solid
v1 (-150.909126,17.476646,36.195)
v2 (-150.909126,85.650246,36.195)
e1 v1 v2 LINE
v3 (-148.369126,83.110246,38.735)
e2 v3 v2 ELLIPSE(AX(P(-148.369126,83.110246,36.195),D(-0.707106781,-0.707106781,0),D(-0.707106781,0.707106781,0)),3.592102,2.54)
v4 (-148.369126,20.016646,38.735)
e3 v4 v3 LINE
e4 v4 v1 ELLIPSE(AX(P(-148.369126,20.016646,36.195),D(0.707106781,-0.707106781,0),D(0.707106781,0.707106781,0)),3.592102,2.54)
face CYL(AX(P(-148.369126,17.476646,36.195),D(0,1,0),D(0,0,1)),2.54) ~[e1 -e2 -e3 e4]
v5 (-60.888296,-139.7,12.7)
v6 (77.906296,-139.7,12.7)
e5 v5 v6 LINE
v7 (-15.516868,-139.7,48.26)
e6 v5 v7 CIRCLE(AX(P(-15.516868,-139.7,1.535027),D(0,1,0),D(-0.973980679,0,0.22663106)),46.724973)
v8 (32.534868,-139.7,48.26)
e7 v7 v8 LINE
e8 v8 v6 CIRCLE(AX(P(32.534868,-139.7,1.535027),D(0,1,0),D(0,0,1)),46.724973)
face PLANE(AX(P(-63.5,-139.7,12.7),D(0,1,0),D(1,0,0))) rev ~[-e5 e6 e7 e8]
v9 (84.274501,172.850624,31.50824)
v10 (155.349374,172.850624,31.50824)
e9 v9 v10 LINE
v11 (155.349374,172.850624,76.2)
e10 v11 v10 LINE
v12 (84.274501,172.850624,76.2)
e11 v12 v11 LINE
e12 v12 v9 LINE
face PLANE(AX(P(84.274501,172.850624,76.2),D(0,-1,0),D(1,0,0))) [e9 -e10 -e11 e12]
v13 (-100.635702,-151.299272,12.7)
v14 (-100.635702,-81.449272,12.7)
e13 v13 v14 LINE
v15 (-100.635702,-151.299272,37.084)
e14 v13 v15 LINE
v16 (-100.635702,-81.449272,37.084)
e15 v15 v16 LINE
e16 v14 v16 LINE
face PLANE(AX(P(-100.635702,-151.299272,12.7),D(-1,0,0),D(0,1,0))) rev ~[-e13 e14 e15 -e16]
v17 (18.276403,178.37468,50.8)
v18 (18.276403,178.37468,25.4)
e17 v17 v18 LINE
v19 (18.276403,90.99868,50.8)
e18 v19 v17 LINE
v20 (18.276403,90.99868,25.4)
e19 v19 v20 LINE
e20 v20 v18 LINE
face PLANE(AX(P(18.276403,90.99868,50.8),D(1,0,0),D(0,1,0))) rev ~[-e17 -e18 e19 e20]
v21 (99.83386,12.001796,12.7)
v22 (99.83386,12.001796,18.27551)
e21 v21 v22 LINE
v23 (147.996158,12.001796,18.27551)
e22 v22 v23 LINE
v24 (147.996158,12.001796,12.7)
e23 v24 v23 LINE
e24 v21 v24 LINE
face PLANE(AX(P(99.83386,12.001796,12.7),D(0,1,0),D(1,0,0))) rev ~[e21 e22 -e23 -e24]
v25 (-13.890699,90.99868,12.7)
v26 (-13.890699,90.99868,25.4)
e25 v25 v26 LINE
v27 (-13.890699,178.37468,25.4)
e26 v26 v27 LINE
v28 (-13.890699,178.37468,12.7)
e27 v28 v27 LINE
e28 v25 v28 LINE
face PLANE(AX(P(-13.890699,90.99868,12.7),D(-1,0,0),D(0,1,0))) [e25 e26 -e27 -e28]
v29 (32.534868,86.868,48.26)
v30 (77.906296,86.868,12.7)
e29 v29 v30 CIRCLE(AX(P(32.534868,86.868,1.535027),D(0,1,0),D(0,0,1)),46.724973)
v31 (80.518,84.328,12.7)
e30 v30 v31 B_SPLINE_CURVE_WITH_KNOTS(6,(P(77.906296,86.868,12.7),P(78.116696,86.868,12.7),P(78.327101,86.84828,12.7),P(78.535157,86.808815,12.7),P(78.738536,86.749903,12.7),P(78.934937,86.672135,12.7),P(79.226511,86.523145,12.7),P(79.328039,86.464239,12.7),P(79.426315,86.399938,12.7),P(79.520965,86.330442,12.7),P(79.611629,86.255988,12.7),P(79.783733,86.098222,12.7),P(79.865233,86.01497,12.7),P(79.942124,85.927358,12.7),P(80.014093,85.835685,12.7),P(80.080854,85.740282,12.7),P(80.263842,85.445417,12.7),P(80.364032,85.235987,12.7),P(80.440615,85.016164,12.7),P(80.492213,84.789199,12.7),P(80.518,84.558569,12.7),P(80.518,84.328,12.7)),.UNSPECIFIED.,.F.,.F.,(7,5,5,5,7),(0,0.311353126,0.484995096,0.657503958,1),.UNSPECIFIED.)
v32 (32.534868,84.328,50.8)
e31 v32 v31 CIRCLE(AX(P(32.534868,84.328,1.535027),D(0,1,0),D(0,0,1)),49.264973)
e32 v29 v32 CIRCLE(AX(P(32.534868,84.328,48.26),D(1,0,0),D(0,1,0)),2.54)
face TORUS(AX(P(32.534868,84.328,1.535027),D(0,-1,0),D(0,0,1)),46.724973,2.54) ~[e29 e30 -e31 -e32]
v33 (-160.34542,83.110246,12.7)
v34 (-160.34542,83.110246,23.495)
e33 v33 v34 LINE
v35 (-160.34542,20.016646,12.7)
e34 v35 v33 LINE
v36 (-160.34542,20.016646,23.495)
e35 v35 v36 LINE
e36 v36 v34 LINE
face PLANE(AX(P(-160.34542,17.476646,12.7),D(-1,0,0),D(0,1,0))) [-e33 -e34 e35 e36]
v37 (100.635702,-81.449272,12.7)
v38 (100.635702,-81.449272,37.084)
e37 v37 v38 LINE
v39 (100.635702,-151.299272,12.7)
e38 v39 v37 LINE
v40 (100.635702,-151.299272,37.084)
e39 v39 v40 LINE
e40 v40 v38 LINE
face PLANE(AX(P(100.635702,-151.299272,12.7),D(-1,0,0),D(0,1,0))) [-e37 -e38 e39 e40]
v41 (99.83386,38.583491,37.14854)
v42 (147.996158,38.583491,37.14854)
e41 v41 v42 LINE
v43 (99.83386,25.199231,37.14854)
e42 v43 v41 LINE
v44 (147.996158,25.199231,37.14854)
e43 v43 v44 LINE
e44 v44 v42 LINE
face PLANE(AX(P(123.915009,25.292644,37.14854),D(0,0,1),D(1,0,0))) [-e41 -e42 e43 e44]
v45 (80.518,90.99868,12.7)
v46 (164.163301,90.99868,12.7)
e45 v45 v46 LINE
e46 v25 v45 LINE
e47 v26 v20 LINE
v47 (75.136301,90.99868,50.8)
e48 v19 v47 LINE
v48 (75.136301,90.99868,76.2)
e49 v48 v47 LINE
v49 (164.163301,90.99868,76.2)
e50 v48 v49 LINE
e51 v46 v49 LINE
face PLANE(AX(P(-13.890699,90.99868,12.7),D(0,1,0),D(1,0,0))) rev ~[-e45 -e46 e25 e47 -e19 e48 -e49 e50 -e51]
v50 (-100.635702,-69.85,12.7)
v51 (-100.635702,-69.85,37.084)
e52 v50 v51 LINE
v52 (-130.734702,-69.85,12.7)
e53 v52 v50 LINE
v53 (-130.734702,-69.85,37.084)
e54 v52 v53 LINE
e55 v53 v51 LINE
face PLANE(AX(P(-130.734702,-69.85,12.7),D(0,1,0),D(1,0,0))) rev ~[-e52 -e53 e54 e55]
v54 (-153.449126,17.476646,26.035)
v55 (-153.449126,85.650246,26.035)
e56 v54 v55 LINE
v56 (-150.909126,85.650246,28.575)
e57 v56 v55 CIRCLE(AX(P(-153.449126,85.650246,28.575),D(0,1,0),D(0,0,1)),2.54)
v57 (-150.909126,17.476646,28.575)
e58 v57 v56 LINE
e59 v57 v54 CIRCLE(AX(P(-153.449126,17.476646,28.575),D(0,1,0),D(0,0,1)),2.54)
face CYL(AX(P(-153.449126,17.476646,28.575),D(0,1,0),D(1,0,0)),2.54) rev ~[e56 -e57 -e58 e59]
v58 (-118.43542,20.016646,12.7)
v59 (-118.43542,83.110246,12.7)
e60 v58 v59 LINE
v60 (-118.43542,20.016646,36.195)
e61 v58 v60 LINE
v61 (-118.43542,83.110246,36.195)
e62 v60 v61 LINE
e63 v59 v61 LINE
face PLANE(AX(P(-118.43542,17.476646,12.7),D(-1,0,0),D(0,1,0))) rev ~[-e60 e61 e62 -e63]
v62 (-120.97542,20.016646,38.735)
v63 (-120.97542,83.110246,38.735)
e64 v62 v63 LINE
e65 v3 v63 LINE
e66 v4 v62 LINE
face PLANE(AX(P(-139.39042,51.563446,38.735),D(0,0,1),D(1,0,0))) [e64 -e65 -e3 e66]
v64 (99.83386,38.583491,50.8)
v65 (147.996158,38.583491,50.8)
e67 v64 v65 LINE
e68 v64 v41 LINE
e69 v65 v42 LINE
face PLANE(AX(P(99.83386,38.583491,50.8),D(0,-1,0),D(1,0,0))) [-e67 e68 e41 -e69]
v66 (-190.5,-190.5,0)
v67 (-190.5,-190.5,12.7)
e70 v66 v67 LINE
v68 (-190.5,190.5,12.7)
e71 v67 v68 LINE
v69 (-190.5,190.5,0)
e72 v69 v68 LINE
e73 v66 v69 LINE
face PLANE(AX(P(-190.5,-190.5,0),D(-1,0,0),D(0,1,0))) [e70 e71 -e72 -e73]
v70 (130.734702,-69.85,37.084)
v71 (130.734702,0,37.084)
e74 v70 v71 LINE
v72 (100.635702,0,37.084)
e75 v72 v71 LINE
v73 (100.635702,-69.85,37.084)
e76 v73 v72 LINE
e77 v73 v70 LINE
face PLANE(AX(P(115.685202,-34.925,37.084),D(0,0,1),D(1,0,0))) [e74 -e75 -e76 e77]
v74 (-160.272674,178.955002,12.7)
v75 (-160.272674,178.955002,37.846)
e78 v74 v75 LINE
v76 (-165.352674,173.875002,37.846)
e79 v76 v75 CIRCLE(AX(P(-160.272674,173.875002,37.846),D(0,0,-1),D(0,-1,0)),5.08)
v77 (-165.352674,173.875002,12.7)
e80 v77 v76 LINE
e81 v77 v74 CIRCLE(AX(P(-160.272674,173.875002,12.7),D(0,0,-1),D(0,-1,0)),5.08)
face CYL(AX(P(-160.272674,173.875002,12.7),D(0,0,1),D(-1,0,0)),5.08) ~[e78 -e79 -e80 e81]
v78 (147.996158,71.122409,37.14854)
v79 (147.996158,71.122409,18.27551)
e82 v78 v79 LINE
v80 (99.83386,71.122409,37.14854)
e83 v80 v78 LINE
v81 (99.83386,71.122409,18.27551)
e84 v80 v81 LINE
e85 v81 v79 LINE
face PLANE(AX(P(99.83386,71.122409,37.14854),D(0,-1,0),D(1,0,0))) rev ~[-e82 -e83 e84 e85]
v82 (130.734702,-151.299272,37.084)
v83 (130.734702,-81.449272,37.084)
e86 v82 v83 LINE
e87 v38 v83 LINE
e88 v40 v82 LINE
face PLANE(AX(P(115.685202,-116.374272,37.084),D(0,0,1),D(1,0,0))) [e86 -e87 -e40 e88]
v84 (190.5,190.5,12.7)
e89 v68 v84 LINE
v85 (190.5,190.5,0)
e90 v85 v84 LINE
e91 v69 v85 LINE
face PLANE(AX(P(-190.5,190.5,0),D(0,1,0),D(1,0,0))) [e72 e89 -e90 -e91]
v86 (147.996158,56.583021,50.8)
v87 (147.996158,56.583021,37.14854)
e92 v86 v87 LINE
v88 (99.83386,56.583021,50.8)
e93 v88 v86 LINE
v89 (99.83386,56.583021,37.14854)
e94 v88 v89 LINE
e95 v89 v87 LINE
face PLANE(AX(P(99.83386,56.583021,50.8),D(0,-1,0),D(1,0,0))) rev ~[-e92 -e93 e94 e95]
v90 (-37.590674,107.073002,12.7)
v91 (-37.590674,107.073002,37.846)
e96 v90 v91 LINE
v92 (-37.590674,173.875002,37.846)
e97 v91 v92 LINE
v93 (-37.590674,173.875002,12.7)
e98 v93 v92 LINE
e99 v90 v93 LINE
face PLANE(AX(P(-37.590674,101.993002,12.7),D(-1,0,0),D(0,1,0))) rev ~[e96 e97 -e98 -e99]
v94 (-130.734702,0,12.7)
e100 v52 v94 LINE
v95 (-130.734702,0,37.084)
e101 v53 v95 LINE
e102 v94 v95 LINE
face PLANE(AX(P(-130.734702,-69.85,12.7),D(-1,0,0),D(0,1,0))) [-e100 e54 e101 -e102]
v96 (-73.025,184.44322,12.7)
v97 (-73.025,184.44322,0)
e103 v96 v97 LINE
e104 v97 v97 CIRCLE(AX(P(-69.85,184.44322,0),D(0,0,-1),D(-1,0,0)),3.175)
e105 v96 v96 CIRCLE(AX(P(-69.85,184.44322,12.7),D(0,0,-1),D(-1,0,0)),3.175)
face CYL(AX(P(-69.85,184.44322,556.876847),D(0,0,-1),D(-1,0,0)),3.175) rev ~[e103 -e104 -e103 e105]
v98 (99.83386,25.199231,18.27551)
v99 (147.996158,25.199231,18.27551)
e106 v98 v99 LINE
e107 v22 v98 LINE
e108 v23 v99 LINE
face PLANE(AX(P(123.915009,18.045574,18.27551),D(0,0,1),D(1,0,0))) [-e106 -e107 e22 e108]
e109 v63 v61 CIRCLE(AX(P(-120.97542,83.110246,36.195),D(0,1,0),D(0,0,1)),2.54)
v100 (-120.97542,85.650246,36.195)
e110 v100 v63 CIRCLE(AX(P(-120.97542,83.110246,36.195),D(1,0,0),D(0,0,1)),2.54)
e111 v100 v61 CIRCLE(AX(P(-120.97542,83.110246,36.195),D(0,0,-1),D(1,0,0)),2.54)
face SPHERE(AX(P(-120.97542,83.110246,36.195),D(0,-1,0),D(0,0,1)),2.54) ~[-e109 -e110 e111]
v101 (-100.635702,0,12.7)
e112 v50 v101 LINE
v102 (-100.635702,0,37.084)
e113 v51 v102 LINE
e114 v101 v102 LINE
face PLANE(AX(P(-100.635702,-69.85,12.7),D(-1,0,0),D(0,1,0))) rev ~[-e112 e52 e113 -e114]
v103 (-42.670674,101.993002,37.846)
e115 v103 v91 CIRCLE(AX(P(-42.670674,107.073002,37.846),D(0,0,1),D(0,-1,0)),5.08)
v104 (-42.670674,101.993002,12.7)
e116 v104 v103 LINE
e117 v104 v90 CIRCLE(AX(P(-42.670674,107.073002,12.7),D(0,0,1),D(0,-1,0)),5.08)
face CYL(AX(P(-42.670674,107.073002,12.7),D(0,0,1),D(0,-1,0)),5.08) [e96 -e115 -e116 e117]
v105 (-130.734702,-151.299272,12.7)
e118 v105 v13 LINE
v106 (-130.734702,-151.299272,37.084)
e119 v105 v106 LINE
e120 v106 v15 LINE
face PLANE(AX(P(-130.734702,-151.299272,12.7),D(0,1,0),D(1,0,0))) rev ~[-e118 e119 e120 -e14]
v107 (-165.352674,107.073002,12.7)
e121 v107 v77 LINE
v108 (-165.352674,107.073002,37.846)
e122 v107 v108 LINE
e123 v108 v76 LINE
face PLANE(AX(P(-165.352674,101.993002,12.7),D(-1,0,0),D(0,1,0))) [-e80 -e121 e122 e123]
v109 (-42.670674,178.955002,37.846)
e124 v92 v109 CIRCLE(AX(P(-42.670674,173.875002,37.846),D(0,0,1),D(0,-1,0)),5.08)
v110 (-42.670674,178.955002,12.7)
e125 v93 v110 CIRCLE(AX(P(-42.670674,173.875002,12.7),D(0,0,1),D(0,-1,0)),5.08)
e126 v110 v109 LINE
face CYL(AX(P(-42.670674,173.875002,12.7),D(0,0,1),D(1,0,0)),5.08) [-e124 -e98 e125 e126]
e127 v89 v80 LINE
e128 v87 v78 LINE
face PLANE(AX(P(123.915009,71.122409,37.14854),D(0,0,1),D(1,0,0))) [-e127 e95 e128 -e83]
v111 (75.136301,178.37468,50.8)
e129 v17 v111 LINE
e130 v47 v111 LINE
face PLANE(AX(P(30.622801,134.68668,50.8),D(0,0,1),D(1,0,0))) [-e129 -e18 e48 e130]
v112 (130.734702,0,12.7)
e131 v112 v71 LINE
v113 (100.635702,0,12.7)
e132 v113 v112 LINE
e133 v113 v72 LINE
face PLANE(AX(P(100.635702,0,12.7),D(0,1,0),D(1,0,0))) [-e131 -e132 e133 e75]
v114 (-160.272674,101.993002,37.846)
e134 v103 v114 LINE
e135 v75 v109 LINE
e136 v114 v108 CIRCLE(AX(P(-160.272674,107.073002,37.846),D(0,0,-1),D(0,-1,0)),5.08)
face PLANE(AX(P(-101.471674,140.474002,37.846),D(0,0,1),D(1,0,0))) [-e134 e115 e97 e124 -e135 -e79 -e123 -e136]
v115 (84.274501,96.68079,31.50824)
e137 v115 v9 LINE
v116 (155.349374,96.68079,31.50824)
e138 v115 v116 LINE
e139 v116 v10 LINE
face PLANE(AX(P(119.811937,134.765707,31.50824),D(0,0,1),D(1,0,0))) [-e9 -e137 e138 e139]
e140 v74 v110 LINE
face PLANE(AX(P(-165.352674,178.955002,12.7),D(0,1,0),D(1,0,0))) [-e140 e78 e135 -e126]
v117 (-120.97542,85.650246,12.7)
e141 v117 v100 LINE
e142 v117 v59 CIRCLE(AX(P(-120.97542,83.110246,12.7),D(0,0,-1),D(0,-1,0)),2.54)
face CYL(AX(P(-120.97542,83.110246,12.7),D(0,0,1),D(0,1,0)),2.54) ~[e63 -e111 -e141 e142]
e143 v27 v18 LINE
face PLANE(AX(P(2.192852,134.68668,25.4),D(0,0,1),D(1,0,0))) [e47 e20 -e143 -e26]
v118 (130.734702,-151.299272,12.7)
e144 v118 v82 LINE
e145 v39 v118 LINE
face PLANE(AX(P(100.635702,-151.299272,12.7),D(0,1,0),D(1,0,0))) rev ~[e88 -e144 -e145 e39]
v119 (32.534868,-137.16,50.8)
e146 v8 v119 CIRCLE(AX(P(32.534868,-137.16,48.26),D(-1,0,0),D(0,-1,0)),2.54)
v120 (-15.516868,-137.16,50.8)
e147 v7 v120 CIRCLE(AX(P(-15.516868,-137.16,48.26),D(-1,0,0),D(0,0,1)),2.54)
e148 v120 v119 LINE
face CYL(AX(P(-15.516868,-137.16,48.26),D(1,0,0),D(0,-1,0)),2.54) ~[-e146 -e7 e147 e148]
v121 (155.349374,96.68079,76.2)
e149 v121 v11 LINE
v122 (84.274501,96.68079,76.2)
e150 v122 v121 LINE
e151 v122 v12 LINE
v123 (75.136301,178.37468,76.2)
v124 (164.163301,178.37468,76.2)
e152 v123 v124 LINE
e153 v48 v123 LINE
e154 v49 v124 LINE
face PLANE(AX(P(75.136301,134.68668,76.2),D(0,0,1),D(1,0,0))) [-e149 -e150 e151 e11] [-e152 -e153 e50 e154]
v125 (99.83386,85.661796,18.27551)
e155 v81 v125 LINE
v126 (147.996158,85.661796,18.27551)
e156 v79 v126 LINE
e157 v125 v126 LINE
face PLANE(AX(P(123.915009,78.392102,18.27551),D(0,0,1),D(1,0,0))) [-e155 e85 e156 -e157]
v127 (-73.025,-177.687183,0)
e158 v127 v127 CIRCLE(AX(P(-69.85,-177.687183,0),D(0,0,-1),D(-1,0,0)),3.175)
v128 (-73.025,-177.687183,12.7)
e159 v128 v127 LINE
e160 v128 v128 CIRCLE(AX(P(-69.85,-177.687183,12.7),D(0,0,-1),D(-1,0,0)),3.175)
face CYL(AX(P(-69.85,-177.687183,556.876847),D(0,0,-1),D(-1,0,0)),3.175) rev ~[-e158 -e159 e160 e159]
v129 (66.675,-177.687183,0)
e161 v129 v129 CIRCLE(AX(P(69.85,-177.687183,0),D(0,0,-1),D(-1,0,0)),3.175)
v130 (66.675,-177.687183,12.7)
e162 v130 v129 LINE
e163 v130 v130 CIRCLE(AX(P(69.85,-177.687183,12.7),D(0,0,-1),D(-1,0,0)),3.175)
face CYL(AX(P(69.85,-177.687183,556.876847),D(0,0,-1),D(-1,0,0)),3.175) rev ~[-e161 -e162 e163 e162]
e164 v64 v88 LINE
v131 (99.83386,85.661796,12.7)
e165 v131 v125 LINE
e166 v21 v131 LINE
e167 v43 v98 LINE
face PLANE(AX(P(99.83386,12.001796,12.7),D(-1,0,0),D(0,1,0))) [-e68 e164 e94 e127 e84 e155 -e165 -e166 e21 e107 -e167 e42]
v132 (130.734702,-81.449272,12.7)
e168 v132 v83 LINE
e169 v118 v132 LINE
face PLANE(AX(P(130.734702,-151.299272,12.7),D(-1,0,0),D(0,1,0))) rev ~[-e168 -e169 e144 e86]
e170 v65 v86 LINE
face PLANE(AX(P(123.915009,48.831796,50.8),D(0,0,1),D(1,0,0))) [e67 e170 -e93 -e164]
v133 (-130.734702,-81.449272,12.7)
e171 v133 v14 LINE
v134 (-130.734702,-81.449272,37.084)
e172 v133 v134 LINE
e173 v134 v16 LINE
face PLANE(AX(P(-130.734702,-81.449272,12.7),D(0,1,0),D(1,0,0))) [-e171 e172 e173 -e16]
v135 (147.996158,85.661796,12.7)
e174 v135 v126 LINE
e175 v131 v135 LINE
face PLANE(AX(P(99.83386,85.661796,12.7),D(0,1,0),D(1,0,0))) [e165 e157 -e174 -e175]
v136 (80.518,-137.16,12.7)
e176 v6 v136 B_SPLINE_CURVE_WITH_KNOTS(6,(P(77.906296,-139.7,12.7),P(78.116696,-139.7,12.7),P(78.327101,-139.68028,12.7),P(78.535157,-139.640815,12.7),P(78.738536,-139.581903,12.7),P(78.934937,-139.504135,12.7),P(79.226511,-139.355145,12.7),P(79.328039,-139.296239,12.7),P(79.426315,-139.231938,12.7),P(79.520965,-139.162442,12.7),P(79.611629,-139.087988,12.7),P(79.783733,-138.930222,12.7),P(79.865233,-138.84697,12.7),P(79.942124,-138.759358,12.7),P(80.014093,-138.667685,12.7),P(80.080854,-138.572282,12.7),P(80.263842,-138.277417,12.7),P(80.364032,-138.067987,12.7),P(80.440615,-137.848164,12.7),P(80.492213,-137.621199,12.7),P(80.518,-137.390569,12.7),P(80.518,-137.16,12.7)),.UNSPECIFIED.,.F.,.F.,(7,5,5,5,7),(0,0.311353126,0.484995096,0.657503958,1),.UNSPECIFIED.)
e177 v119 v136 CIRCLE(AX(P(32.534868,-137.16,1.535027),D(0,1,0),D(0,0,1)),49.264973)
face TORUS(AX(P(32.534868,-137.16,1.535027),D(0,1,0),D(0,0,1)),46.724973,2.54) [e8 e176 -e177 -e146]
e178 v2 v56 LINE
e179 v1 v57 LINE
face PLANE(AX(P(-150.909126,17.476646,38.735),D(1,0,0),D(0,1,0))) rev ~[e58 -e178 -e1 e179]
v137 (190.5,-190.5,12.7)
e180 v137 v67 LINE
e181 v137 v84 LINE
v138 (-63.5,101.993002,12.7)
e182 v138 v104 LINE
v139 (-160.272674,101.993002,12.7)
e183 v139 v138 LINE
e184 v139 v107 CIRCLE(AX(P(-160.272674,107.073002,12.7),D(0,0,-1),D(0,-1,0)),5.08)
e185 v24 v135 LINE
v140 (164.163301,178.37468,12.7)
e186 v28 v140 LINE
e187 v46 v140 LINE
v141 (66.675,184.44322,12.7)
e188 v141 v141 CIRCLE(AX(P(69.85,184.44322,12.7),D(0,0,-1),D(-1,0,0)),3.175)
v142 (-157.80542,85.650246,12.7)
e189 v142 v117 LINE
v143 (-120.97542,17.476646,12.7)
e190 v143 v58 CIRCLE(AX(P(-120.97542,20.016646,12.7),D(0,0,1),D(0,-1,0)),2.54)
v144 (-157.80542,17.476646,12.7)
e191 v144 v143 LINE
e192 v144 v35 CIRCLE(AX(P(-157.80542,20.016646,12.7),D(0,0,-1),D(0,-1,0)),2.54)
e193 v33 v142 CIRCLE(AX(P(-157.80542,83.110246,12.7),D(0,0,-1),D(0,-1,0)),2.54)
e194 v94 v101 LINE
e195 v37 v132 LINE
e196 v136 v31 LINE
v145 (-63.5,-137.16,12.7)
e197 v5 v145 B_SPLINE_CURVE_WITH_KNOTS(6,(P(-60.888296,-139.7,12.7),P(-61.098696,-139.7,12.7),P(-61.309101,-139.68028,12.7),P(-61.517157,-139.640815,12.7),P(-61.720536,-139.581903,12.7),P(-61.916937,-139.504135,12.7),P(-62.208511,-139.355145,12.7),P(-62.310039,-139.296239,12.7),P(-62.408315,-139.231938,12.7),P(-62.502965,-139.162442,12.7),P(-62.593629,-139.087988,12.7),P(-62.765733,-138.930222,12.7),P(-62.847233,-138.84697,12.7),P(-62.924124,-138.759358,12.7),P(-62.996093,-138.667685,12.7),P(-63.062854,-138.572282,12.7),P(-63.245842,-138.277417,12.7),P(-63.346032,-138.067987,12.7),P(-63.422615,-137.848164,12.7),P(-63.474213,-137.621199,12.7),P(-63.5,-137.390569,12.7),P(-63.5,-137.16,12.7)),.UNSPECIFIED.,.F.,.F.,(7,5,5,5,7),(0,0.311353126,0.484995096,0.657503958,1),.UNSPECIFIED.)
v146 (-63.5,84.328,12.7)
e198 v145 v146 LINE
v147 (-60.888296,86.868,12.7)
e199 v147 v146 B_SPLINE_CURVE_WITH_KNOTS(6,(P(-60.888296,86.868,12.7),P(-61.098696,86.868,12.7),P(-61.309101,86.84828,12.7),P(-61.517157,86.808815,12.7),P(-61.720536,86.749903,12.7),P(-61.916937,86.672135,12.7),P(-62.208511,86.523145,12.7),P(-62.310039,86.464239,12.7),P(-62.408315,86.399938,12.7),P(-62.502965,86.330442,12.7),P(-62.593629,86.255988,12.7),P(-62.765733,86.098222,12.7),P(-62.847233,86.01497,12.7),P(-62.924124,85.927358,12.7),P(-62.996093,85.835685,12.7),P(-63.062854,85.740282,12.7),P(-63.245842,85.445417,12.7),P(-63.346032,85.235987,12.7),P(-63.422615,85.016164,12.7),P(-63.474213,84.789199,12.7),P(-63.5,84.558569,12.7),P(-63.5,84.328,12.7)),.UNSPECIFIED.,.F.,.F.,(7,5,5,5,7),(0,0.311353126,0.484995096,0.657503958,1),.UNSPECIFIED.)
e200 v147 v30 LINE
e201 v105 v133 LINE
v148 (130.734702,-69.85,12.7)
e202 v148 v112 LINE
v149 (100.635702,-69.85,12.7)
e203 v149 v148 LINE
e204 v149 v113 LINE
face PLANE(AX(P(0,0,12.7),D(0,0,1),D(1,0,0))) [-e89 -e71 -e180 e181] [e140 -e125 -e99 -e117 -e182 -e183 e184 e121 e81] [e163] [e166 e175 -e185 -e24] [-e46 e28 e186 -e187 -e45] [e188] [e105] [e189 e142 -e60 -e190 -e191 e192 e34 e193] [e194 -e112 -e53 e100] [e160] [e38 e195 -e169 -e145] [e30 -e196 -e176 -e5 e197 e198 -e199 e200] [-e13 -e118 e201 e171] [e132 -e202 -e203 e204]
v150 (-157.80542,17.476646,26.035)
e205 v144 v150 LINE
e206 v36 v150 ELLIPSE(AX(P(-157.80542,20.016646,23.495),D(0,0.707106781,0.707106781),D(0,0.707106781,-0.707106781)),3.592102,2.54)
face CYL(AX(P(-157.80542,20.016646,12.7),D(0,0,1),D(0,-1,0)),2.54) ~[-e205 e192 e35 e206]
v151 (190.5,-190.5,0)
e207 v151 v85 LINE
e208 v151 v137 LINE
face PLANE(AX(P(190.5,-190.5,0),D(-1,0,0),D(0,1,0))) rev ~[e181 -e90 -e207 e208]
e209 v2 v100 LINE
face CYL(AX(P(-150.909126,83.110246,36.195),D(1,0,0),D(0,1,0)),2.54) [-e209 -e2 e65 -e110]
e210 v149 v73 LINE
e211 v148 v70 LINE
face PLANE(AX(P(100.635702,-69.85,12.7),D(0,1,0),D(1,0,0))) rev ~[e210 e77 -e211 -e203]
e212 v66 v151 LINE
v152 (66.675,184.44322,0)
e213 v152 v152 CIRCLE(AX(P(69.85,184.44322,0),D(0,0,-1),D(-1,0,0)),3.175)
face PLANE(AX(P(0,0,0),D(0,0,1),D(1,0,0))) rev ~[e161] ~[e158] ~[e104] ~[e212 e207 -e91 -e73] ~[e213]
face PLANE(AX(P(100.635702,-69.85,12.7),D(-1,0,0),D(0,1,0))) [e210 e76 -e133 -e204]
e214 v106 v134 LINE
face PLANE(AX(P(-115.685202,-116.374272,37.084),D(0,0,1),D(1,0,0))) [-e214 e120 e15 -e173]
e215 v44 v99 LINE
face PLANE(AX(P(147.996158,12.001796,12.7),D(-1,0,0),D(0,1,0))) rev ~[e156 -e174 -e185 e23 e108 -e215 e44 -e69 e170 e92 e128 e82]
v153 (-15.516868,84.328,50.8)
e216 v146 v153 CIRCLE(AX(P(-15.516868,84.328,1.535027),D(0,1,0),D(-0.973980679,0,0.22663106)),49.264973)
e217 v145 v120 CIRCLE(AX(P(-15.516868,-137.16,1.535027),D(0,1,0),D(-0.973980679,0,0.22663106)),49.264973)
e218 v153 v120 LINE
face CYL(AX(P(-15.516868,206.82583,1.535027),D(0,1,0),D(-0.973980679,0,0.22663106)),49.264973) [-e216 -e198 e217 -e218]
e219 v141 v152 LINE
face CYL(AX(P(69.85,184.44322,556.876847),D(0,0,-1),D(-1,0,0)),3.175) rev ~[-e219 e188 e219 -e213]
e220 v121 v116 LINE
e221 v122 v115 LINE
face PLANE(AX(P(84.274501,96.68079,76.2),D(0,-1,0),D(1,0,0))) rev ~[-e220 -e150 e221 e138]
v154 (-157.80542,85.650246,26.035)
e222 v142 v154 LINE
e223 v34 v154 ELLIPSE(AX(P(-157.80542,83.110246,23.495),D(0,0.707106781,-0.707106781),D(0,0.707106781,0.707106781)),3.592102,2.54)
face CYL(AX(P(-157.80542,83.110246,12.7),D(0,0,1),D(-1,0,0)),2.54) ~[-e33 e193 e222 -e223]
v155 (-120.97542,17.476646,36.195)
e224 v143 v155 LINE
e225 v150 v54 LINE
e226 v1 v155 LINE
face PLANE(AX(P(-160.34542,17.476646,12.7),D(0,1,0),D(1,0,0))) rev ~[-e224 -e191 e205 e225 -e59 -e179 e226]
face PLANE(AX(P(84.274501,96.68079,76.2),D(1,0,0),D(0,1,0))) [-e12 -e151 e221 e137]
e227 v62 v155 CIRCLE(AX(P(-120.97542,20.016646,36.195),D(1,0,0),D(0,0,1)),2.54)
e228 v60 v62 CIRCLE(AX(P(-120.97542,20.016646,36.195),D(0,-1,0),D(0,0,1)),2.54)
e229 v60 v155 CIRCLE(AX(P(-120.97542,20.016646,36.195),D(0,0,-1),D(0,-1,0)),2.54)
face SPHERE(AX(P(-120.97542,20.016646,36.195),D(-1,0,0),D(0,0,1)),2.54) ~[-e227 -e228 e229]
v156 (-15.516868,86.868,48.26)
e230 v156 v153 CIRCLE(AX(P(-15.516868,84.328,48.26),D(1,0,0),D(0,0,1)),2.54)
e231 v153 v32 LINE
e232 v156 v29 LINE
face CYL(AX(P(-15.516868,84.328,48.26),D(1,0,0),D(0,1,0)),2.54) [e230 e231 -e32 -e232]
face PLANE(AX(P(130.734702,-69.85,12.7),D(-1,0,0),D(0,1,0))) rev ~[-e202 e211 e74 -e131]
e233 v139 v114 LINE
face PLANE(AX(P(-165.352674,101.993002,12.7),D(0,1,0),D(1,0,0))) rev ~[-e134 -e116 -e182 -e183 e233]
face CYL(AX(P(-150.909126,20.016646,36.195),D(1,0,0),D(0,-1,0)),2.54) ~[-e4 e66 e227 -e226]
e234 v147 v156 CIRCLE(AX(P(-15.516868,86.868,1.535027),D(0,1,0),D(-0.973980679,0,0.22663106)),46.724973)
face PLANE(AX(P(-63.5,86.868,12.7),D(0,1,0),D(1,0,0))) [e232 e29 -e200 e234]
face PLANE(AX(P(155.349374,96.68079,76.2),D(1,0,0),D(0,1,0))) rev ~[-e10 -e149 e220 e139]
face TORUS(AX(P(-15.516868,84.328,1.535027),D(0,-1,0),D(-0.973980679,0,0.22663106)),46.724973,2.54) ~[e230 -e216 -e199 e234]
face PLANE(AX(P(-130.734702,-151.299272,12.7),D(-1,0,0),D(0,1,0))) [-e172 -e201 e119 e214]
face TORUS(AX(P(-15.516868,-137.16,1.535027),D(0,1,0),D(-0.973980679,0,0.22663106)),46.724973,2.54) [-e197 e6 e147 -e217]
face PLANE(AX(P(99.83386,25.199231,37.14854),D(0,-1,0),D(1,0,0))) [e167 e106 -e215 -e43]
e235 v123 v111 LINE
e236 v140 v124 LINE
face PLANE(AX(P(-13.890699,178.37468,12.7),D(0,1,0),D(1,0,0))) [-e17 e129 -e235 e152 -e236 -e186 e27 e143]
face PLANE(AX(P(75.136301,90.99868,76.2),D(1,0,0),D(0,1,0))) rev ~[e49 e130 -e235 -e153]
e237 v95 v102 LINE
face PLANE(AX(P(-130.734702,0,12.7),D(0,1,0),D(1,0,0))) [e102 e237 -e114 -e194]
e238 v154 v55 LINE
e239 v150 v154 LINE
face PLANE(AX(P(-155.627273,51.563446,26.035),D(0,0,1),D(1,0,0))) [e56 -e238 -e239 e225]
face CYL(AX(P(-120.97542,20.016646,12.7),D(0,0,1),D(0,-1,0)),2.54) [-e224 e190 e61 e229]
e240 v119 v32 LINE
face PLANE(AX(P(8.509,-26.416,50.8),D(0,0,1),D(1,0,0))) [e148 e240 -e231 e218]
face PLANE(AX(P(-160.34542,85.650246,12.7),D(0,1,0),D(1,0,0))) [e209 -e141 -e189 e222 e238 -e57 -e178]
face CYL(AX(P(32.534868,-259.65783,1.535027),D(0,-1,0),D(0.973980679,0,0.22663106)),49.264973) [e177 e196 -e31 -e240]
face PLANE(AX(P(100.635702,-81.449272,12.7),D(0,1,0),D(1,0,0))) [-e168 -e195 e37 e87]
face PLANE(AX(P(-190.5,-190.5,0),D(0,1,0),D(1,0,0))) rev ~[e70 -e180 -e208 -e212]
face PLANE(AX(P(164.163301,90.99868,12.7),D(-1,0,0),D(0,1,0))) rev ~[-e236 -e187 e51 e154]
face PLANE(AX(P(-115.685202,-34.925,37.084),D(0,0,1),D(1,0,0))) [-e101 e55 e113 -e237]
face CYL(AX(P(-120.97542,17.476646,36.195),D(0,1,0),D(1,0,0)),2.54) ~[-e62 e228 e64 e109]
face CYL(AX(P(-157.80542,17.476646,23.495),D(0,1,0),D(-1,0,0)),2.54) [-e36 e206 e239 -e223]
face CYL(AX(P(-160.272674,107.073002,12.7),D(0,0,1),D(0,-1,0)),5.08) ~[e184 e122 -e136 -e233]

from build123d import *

# Parameters (mm, degrees)
F0_W         = 381
F0_H         = 381
F1_DEPTH     = 12.7
F3_W         = 144.018
F3_H         = 226.568
F4_DEPTH     = 38.1
F5_W         = 178.054
F5_H         = 87.376
F6_DEPTH     = 63.5
F7_W         = 127.762
F7_H         = 76.962
F8_DEPTH     = 25.146
F9_W         = 41.91
F9_H         = 68.1736
F10_DEPTH    = 26.035
F11_W        = 48.1622978261
F11_H        = 73.66
F12_DEPTH    = 38.1
F13_W        = 30.099
F13_H        = 69.85
F14_DEPTH    = 24.384
F15_T4_DEPTH = 466.4836595949
F15_T9_DEPTH = 466.4836595949
F16_W        = 71.074873209
F16_H        = 76.1698335409
F17_DEPTH    = 44.69176
F18_W        = 89.027
F18_H        = 87.376
F19_DEPTH    = 25.4
F20_W        = 32.1671016191
F20_H        = 87.376
F21_DEPTH    = 25.4
F22_W        = 48.1622978261
F22_H        = 29.0787754375
F22_H_2      = 26.581694724
F23_DEPTH    = 13.65146
F24_W        = 48.1622978261
F24_H        = 14.5393877187
F24_H_2      = 14.3073135987
F25_DEPTH    = 18.87303
F26_W        = 9.4362943637
F26_H        = 68.1736
F27_DEPTH    = 12.7
F28_R        = 2.54
F30_D        = 6.35
F31_R        = 5.08


# Not quite as in the source:
# - a fillet or chamfer that OpenCascade refuses, or shapes differently, is made with other operations: its cross-section is extruded or revolved along the edge and cut away or added


with BuildPart() as f1:
    # F0 (on Top) → F1 (new body)
    with BuildSketch(Plane.XY):
        Rectangle(F0_W, F0_H)
    extrude(amount=F1_DEPTH)

    # F3 (on face) → F4 (join)
    with BuildSketch(Plane.XY.offset(12.7)):
        with Locations((8.509, -26.416)):
            Rectangle(F3_W, F3_H)
    extrude(amount=F4_DEPTH)

    # F5 (on face) → F6 (join)
    with BuildSketch(Plane.XY.offset(12.7)):
        with Locations((75.1363011077, 134.6866802573)):
            Rectangle(F5_W, F5_H)
    extrude(amount=F6_DEPTH)

    # F7 (on face) → F8 (join)
    with BuildSketch(Plane.XY.offset(12.7)):
        with Locations((-101.4716736972, 140.4740017718)):
            Rectangle(F7_W, F7_H)
    extrude(amount=F8_DEPTH)

    # F9 (on face) → F10 (join)
    with BuildSketch(Plane.XY.offset(12.7)):
        with Locations((-139.3904201686, 51.5634464747)):
            Rectangle(F9_W, F9_H)
    extrude(amount=F10_DEPTH)

    # F11 (on face) → F12 (join)
    with BuildSketch(Plane.XY.offset(12.7)):
        with Locations((123.9150092006, 48.8317962736)):
            Rectangle(F11_W, F11_H)
    extrude(amount=F12_DEPTH)

    # F13 (on face) → F14 (join)
    with BuildSketch(Plane.XY.offset(12.7)):
        with Locations((-115.685201868, -34.925)):
            Rectangle(F13_W, F13_H)
        with Locations((-115.685201868, -116.3742716573)):
            Rectangle(F13_W, F13_H)
        with Locations((115.685201868, -34.925)):
            Rectangle(F13_W, F13_H)
        with Locations((115.685201868, -116.3742716573)):
            Rectangle(F13_W, F13_H)
    extrude(amount=F14_DEPTH)

    # F15: fillet of radius 49.2649730808 on 2 edges, made by hand


with BuildPart() as f15_tool2:
    # F15_s3 → F15_t4 (new body)
    with BuildSketch(Plane.XZ.offset(259.6578297975)):
        with BuildLine():
            ThreePointArc((80.518, 12.7), (63.1697785132, 40.1166266199), (32.534868081, 50.8))
            Line((32.534868081, 50.8), (80.518, 50.8))
            Line((80.518, 50.8), (80.518, 12.7))
        make_face()
    extrude(amount=-F15_T4_DEPTH)

    split(bisect_by=Plane.XZ.offset(-90.9986802573), keep=Keep.TOP)


with BuildPart() as f1_1:
    add(f1.part)

    # F15_t1: cut F15_tool2
    add(f15_tool2.part, mode=Mode.SUBTRACT)


with BuildPart() as f15_tool7:
    # F15_s8 → F15_t9 (new body)
    with BuildSketch(Plane.XZ.offset(-206.8258297975)):
        with BuildLine():
            ThreePointArc((-63.5, 12.7), (-46.1517785132, 40.1166266199), (-15.516868081, 50.8))
            Line((-15.516868081, 50.8), (-63.5, 50.8))
            Line((-63.5, 50.8), (-63.5, 12.7))
        make_face()
    extrude(amount=F15_T9_DEPTH)

    split(bisect_by=Plane.XZ.offset(-101.9930017718), keep=Keep.TOP)


with BuildPart() as f1_2:
    add(f1_1.part)

    # F15_t6: cut F15_tool7
    add(f15_tool7.part, mode=Mode.SUBTRACT)

    # F16 (on face) → F17 (cut)
    with BuildSketch(Plane.XY.offset(76.2)):
        with Locations((119.8119372129, 134.7657069564)):
            Rectangle(F16_W, F16_H)
    extrude(amount=-F17_DEPTH, mode=Mode.SUBTRACT)

    # F18 (on face) → F19 (cut)
    with BuildSketch(Plane.XY.offset(76.2)):
        with Locations((30.6228011077, 134.6866802573)):
            Rectangle(F18_W, F18_H)
    extrude(amount=-F19_DEPTH, mode=Mode.SUBTRACT)

    # F20 (on face) → F21 (cut)
    with BuildSketch(Plane.XY.offset(50.8)):
        with Locations((2.1928519172, 134.6866802573)):
            Rectangle(F20_W, F20_H)
    extrude(amount=-F21_DEPTH, mode=Mode.SUBTRACT)

    # F22 (on face) → F23 (cut)
    with BuildSketch(Plane.XY.offset(50.8)):
        with Locations((123.9150092006, 71.1224085549)):
            Rectangle(F22_W, F22_H)
        with Locations((123.9150092006, 25.2926436356)):
            Rectangle(F22_W, F22_H_2)
    extrude(amount=-F23_DEPTH, mode=Mode.SUBTRACT)

    # F24 (on face) → F25 (cut)
    with BuildSketch(Plane.XY.offset(37.14854)):
        with Locations((123.9150092006, 78.3921024142)):
            Rectangle(F24_W, F24_H)
        with Locations((123.9150092006, 18.045573961)):
            Rectangle(F24_W, F24_H_2)
    extrude(amount=-F25_DEPTH, mode=Mode.SUBTRACT)

    # F26 (on face) → F27 (cut)
    with BuildSketch(Plane.XY.offset(38.735)):
        with Locations((-155.6272729868, 51.5634464747)):
            Rectangle(F26_W, F26_H)
    extrude(amount=-F27_DEPTH, mode=Mode.SUBTRACT)

    # F28
    f28_edges = [f1_2.edges().sort_by_distance(p)[0] for p in [
        (-150.909126, 51.563446, 26.035),
        (-160.34542, 51.563446, 26.035),
        (-150.909126, 51.563446, 38.735),
        (-134.672273, 17.476646, 38.735),
        (-118.43542, 51.563446, 38.735),
        (-134.672273, 85.650246, 38.735),
        (-118.43542, 17.476646, 25.7175),
        (32.534868, -26.416, 50.8),
        (8.509, -139.7, 50.8),
        (-15.516868, -26.416, 50.8),
        (8.509, 86.868, 50.8),
        (-160.34542, 17.476646, 19.3675),
        (-160.34542, 85.650246, 19.3675),
        (-118.43542, 85.650246, 25.7175),
        (63.169779, 86.868, 40.116627),
        (63.169779, -139.7, 40.116627),
        (-46.151779, -139.7, 40.116627),
        (-46.151779, 86.868, 40.116627),
    ]]
    fillet(f28_edges, radius=F28_R)

    # F30 (through all)
    with Locations(Plane.XY.offset(12.7)):
        with Locations((-69.85, -177.6871830225), (69.85, -177.6871830225), (69.85, 184.4432204962), (-69.85, 184.4432204962)):
            Hole(F30_D / 2)

    # F31
    f31_edges = [f1_2.edges().sort_by_distance(p)[0] for p in [
        (-37.590674, 101.993002, 25.273),
        (-165.352674, 101.993002, 25.273),
        (-165.352674, 178.955002, 25.273),
        (-37.590674, 178.955002, 25.273),
    ]]
    fillet(f31_edges, radius=F31_R)


solid = f1_2.part
